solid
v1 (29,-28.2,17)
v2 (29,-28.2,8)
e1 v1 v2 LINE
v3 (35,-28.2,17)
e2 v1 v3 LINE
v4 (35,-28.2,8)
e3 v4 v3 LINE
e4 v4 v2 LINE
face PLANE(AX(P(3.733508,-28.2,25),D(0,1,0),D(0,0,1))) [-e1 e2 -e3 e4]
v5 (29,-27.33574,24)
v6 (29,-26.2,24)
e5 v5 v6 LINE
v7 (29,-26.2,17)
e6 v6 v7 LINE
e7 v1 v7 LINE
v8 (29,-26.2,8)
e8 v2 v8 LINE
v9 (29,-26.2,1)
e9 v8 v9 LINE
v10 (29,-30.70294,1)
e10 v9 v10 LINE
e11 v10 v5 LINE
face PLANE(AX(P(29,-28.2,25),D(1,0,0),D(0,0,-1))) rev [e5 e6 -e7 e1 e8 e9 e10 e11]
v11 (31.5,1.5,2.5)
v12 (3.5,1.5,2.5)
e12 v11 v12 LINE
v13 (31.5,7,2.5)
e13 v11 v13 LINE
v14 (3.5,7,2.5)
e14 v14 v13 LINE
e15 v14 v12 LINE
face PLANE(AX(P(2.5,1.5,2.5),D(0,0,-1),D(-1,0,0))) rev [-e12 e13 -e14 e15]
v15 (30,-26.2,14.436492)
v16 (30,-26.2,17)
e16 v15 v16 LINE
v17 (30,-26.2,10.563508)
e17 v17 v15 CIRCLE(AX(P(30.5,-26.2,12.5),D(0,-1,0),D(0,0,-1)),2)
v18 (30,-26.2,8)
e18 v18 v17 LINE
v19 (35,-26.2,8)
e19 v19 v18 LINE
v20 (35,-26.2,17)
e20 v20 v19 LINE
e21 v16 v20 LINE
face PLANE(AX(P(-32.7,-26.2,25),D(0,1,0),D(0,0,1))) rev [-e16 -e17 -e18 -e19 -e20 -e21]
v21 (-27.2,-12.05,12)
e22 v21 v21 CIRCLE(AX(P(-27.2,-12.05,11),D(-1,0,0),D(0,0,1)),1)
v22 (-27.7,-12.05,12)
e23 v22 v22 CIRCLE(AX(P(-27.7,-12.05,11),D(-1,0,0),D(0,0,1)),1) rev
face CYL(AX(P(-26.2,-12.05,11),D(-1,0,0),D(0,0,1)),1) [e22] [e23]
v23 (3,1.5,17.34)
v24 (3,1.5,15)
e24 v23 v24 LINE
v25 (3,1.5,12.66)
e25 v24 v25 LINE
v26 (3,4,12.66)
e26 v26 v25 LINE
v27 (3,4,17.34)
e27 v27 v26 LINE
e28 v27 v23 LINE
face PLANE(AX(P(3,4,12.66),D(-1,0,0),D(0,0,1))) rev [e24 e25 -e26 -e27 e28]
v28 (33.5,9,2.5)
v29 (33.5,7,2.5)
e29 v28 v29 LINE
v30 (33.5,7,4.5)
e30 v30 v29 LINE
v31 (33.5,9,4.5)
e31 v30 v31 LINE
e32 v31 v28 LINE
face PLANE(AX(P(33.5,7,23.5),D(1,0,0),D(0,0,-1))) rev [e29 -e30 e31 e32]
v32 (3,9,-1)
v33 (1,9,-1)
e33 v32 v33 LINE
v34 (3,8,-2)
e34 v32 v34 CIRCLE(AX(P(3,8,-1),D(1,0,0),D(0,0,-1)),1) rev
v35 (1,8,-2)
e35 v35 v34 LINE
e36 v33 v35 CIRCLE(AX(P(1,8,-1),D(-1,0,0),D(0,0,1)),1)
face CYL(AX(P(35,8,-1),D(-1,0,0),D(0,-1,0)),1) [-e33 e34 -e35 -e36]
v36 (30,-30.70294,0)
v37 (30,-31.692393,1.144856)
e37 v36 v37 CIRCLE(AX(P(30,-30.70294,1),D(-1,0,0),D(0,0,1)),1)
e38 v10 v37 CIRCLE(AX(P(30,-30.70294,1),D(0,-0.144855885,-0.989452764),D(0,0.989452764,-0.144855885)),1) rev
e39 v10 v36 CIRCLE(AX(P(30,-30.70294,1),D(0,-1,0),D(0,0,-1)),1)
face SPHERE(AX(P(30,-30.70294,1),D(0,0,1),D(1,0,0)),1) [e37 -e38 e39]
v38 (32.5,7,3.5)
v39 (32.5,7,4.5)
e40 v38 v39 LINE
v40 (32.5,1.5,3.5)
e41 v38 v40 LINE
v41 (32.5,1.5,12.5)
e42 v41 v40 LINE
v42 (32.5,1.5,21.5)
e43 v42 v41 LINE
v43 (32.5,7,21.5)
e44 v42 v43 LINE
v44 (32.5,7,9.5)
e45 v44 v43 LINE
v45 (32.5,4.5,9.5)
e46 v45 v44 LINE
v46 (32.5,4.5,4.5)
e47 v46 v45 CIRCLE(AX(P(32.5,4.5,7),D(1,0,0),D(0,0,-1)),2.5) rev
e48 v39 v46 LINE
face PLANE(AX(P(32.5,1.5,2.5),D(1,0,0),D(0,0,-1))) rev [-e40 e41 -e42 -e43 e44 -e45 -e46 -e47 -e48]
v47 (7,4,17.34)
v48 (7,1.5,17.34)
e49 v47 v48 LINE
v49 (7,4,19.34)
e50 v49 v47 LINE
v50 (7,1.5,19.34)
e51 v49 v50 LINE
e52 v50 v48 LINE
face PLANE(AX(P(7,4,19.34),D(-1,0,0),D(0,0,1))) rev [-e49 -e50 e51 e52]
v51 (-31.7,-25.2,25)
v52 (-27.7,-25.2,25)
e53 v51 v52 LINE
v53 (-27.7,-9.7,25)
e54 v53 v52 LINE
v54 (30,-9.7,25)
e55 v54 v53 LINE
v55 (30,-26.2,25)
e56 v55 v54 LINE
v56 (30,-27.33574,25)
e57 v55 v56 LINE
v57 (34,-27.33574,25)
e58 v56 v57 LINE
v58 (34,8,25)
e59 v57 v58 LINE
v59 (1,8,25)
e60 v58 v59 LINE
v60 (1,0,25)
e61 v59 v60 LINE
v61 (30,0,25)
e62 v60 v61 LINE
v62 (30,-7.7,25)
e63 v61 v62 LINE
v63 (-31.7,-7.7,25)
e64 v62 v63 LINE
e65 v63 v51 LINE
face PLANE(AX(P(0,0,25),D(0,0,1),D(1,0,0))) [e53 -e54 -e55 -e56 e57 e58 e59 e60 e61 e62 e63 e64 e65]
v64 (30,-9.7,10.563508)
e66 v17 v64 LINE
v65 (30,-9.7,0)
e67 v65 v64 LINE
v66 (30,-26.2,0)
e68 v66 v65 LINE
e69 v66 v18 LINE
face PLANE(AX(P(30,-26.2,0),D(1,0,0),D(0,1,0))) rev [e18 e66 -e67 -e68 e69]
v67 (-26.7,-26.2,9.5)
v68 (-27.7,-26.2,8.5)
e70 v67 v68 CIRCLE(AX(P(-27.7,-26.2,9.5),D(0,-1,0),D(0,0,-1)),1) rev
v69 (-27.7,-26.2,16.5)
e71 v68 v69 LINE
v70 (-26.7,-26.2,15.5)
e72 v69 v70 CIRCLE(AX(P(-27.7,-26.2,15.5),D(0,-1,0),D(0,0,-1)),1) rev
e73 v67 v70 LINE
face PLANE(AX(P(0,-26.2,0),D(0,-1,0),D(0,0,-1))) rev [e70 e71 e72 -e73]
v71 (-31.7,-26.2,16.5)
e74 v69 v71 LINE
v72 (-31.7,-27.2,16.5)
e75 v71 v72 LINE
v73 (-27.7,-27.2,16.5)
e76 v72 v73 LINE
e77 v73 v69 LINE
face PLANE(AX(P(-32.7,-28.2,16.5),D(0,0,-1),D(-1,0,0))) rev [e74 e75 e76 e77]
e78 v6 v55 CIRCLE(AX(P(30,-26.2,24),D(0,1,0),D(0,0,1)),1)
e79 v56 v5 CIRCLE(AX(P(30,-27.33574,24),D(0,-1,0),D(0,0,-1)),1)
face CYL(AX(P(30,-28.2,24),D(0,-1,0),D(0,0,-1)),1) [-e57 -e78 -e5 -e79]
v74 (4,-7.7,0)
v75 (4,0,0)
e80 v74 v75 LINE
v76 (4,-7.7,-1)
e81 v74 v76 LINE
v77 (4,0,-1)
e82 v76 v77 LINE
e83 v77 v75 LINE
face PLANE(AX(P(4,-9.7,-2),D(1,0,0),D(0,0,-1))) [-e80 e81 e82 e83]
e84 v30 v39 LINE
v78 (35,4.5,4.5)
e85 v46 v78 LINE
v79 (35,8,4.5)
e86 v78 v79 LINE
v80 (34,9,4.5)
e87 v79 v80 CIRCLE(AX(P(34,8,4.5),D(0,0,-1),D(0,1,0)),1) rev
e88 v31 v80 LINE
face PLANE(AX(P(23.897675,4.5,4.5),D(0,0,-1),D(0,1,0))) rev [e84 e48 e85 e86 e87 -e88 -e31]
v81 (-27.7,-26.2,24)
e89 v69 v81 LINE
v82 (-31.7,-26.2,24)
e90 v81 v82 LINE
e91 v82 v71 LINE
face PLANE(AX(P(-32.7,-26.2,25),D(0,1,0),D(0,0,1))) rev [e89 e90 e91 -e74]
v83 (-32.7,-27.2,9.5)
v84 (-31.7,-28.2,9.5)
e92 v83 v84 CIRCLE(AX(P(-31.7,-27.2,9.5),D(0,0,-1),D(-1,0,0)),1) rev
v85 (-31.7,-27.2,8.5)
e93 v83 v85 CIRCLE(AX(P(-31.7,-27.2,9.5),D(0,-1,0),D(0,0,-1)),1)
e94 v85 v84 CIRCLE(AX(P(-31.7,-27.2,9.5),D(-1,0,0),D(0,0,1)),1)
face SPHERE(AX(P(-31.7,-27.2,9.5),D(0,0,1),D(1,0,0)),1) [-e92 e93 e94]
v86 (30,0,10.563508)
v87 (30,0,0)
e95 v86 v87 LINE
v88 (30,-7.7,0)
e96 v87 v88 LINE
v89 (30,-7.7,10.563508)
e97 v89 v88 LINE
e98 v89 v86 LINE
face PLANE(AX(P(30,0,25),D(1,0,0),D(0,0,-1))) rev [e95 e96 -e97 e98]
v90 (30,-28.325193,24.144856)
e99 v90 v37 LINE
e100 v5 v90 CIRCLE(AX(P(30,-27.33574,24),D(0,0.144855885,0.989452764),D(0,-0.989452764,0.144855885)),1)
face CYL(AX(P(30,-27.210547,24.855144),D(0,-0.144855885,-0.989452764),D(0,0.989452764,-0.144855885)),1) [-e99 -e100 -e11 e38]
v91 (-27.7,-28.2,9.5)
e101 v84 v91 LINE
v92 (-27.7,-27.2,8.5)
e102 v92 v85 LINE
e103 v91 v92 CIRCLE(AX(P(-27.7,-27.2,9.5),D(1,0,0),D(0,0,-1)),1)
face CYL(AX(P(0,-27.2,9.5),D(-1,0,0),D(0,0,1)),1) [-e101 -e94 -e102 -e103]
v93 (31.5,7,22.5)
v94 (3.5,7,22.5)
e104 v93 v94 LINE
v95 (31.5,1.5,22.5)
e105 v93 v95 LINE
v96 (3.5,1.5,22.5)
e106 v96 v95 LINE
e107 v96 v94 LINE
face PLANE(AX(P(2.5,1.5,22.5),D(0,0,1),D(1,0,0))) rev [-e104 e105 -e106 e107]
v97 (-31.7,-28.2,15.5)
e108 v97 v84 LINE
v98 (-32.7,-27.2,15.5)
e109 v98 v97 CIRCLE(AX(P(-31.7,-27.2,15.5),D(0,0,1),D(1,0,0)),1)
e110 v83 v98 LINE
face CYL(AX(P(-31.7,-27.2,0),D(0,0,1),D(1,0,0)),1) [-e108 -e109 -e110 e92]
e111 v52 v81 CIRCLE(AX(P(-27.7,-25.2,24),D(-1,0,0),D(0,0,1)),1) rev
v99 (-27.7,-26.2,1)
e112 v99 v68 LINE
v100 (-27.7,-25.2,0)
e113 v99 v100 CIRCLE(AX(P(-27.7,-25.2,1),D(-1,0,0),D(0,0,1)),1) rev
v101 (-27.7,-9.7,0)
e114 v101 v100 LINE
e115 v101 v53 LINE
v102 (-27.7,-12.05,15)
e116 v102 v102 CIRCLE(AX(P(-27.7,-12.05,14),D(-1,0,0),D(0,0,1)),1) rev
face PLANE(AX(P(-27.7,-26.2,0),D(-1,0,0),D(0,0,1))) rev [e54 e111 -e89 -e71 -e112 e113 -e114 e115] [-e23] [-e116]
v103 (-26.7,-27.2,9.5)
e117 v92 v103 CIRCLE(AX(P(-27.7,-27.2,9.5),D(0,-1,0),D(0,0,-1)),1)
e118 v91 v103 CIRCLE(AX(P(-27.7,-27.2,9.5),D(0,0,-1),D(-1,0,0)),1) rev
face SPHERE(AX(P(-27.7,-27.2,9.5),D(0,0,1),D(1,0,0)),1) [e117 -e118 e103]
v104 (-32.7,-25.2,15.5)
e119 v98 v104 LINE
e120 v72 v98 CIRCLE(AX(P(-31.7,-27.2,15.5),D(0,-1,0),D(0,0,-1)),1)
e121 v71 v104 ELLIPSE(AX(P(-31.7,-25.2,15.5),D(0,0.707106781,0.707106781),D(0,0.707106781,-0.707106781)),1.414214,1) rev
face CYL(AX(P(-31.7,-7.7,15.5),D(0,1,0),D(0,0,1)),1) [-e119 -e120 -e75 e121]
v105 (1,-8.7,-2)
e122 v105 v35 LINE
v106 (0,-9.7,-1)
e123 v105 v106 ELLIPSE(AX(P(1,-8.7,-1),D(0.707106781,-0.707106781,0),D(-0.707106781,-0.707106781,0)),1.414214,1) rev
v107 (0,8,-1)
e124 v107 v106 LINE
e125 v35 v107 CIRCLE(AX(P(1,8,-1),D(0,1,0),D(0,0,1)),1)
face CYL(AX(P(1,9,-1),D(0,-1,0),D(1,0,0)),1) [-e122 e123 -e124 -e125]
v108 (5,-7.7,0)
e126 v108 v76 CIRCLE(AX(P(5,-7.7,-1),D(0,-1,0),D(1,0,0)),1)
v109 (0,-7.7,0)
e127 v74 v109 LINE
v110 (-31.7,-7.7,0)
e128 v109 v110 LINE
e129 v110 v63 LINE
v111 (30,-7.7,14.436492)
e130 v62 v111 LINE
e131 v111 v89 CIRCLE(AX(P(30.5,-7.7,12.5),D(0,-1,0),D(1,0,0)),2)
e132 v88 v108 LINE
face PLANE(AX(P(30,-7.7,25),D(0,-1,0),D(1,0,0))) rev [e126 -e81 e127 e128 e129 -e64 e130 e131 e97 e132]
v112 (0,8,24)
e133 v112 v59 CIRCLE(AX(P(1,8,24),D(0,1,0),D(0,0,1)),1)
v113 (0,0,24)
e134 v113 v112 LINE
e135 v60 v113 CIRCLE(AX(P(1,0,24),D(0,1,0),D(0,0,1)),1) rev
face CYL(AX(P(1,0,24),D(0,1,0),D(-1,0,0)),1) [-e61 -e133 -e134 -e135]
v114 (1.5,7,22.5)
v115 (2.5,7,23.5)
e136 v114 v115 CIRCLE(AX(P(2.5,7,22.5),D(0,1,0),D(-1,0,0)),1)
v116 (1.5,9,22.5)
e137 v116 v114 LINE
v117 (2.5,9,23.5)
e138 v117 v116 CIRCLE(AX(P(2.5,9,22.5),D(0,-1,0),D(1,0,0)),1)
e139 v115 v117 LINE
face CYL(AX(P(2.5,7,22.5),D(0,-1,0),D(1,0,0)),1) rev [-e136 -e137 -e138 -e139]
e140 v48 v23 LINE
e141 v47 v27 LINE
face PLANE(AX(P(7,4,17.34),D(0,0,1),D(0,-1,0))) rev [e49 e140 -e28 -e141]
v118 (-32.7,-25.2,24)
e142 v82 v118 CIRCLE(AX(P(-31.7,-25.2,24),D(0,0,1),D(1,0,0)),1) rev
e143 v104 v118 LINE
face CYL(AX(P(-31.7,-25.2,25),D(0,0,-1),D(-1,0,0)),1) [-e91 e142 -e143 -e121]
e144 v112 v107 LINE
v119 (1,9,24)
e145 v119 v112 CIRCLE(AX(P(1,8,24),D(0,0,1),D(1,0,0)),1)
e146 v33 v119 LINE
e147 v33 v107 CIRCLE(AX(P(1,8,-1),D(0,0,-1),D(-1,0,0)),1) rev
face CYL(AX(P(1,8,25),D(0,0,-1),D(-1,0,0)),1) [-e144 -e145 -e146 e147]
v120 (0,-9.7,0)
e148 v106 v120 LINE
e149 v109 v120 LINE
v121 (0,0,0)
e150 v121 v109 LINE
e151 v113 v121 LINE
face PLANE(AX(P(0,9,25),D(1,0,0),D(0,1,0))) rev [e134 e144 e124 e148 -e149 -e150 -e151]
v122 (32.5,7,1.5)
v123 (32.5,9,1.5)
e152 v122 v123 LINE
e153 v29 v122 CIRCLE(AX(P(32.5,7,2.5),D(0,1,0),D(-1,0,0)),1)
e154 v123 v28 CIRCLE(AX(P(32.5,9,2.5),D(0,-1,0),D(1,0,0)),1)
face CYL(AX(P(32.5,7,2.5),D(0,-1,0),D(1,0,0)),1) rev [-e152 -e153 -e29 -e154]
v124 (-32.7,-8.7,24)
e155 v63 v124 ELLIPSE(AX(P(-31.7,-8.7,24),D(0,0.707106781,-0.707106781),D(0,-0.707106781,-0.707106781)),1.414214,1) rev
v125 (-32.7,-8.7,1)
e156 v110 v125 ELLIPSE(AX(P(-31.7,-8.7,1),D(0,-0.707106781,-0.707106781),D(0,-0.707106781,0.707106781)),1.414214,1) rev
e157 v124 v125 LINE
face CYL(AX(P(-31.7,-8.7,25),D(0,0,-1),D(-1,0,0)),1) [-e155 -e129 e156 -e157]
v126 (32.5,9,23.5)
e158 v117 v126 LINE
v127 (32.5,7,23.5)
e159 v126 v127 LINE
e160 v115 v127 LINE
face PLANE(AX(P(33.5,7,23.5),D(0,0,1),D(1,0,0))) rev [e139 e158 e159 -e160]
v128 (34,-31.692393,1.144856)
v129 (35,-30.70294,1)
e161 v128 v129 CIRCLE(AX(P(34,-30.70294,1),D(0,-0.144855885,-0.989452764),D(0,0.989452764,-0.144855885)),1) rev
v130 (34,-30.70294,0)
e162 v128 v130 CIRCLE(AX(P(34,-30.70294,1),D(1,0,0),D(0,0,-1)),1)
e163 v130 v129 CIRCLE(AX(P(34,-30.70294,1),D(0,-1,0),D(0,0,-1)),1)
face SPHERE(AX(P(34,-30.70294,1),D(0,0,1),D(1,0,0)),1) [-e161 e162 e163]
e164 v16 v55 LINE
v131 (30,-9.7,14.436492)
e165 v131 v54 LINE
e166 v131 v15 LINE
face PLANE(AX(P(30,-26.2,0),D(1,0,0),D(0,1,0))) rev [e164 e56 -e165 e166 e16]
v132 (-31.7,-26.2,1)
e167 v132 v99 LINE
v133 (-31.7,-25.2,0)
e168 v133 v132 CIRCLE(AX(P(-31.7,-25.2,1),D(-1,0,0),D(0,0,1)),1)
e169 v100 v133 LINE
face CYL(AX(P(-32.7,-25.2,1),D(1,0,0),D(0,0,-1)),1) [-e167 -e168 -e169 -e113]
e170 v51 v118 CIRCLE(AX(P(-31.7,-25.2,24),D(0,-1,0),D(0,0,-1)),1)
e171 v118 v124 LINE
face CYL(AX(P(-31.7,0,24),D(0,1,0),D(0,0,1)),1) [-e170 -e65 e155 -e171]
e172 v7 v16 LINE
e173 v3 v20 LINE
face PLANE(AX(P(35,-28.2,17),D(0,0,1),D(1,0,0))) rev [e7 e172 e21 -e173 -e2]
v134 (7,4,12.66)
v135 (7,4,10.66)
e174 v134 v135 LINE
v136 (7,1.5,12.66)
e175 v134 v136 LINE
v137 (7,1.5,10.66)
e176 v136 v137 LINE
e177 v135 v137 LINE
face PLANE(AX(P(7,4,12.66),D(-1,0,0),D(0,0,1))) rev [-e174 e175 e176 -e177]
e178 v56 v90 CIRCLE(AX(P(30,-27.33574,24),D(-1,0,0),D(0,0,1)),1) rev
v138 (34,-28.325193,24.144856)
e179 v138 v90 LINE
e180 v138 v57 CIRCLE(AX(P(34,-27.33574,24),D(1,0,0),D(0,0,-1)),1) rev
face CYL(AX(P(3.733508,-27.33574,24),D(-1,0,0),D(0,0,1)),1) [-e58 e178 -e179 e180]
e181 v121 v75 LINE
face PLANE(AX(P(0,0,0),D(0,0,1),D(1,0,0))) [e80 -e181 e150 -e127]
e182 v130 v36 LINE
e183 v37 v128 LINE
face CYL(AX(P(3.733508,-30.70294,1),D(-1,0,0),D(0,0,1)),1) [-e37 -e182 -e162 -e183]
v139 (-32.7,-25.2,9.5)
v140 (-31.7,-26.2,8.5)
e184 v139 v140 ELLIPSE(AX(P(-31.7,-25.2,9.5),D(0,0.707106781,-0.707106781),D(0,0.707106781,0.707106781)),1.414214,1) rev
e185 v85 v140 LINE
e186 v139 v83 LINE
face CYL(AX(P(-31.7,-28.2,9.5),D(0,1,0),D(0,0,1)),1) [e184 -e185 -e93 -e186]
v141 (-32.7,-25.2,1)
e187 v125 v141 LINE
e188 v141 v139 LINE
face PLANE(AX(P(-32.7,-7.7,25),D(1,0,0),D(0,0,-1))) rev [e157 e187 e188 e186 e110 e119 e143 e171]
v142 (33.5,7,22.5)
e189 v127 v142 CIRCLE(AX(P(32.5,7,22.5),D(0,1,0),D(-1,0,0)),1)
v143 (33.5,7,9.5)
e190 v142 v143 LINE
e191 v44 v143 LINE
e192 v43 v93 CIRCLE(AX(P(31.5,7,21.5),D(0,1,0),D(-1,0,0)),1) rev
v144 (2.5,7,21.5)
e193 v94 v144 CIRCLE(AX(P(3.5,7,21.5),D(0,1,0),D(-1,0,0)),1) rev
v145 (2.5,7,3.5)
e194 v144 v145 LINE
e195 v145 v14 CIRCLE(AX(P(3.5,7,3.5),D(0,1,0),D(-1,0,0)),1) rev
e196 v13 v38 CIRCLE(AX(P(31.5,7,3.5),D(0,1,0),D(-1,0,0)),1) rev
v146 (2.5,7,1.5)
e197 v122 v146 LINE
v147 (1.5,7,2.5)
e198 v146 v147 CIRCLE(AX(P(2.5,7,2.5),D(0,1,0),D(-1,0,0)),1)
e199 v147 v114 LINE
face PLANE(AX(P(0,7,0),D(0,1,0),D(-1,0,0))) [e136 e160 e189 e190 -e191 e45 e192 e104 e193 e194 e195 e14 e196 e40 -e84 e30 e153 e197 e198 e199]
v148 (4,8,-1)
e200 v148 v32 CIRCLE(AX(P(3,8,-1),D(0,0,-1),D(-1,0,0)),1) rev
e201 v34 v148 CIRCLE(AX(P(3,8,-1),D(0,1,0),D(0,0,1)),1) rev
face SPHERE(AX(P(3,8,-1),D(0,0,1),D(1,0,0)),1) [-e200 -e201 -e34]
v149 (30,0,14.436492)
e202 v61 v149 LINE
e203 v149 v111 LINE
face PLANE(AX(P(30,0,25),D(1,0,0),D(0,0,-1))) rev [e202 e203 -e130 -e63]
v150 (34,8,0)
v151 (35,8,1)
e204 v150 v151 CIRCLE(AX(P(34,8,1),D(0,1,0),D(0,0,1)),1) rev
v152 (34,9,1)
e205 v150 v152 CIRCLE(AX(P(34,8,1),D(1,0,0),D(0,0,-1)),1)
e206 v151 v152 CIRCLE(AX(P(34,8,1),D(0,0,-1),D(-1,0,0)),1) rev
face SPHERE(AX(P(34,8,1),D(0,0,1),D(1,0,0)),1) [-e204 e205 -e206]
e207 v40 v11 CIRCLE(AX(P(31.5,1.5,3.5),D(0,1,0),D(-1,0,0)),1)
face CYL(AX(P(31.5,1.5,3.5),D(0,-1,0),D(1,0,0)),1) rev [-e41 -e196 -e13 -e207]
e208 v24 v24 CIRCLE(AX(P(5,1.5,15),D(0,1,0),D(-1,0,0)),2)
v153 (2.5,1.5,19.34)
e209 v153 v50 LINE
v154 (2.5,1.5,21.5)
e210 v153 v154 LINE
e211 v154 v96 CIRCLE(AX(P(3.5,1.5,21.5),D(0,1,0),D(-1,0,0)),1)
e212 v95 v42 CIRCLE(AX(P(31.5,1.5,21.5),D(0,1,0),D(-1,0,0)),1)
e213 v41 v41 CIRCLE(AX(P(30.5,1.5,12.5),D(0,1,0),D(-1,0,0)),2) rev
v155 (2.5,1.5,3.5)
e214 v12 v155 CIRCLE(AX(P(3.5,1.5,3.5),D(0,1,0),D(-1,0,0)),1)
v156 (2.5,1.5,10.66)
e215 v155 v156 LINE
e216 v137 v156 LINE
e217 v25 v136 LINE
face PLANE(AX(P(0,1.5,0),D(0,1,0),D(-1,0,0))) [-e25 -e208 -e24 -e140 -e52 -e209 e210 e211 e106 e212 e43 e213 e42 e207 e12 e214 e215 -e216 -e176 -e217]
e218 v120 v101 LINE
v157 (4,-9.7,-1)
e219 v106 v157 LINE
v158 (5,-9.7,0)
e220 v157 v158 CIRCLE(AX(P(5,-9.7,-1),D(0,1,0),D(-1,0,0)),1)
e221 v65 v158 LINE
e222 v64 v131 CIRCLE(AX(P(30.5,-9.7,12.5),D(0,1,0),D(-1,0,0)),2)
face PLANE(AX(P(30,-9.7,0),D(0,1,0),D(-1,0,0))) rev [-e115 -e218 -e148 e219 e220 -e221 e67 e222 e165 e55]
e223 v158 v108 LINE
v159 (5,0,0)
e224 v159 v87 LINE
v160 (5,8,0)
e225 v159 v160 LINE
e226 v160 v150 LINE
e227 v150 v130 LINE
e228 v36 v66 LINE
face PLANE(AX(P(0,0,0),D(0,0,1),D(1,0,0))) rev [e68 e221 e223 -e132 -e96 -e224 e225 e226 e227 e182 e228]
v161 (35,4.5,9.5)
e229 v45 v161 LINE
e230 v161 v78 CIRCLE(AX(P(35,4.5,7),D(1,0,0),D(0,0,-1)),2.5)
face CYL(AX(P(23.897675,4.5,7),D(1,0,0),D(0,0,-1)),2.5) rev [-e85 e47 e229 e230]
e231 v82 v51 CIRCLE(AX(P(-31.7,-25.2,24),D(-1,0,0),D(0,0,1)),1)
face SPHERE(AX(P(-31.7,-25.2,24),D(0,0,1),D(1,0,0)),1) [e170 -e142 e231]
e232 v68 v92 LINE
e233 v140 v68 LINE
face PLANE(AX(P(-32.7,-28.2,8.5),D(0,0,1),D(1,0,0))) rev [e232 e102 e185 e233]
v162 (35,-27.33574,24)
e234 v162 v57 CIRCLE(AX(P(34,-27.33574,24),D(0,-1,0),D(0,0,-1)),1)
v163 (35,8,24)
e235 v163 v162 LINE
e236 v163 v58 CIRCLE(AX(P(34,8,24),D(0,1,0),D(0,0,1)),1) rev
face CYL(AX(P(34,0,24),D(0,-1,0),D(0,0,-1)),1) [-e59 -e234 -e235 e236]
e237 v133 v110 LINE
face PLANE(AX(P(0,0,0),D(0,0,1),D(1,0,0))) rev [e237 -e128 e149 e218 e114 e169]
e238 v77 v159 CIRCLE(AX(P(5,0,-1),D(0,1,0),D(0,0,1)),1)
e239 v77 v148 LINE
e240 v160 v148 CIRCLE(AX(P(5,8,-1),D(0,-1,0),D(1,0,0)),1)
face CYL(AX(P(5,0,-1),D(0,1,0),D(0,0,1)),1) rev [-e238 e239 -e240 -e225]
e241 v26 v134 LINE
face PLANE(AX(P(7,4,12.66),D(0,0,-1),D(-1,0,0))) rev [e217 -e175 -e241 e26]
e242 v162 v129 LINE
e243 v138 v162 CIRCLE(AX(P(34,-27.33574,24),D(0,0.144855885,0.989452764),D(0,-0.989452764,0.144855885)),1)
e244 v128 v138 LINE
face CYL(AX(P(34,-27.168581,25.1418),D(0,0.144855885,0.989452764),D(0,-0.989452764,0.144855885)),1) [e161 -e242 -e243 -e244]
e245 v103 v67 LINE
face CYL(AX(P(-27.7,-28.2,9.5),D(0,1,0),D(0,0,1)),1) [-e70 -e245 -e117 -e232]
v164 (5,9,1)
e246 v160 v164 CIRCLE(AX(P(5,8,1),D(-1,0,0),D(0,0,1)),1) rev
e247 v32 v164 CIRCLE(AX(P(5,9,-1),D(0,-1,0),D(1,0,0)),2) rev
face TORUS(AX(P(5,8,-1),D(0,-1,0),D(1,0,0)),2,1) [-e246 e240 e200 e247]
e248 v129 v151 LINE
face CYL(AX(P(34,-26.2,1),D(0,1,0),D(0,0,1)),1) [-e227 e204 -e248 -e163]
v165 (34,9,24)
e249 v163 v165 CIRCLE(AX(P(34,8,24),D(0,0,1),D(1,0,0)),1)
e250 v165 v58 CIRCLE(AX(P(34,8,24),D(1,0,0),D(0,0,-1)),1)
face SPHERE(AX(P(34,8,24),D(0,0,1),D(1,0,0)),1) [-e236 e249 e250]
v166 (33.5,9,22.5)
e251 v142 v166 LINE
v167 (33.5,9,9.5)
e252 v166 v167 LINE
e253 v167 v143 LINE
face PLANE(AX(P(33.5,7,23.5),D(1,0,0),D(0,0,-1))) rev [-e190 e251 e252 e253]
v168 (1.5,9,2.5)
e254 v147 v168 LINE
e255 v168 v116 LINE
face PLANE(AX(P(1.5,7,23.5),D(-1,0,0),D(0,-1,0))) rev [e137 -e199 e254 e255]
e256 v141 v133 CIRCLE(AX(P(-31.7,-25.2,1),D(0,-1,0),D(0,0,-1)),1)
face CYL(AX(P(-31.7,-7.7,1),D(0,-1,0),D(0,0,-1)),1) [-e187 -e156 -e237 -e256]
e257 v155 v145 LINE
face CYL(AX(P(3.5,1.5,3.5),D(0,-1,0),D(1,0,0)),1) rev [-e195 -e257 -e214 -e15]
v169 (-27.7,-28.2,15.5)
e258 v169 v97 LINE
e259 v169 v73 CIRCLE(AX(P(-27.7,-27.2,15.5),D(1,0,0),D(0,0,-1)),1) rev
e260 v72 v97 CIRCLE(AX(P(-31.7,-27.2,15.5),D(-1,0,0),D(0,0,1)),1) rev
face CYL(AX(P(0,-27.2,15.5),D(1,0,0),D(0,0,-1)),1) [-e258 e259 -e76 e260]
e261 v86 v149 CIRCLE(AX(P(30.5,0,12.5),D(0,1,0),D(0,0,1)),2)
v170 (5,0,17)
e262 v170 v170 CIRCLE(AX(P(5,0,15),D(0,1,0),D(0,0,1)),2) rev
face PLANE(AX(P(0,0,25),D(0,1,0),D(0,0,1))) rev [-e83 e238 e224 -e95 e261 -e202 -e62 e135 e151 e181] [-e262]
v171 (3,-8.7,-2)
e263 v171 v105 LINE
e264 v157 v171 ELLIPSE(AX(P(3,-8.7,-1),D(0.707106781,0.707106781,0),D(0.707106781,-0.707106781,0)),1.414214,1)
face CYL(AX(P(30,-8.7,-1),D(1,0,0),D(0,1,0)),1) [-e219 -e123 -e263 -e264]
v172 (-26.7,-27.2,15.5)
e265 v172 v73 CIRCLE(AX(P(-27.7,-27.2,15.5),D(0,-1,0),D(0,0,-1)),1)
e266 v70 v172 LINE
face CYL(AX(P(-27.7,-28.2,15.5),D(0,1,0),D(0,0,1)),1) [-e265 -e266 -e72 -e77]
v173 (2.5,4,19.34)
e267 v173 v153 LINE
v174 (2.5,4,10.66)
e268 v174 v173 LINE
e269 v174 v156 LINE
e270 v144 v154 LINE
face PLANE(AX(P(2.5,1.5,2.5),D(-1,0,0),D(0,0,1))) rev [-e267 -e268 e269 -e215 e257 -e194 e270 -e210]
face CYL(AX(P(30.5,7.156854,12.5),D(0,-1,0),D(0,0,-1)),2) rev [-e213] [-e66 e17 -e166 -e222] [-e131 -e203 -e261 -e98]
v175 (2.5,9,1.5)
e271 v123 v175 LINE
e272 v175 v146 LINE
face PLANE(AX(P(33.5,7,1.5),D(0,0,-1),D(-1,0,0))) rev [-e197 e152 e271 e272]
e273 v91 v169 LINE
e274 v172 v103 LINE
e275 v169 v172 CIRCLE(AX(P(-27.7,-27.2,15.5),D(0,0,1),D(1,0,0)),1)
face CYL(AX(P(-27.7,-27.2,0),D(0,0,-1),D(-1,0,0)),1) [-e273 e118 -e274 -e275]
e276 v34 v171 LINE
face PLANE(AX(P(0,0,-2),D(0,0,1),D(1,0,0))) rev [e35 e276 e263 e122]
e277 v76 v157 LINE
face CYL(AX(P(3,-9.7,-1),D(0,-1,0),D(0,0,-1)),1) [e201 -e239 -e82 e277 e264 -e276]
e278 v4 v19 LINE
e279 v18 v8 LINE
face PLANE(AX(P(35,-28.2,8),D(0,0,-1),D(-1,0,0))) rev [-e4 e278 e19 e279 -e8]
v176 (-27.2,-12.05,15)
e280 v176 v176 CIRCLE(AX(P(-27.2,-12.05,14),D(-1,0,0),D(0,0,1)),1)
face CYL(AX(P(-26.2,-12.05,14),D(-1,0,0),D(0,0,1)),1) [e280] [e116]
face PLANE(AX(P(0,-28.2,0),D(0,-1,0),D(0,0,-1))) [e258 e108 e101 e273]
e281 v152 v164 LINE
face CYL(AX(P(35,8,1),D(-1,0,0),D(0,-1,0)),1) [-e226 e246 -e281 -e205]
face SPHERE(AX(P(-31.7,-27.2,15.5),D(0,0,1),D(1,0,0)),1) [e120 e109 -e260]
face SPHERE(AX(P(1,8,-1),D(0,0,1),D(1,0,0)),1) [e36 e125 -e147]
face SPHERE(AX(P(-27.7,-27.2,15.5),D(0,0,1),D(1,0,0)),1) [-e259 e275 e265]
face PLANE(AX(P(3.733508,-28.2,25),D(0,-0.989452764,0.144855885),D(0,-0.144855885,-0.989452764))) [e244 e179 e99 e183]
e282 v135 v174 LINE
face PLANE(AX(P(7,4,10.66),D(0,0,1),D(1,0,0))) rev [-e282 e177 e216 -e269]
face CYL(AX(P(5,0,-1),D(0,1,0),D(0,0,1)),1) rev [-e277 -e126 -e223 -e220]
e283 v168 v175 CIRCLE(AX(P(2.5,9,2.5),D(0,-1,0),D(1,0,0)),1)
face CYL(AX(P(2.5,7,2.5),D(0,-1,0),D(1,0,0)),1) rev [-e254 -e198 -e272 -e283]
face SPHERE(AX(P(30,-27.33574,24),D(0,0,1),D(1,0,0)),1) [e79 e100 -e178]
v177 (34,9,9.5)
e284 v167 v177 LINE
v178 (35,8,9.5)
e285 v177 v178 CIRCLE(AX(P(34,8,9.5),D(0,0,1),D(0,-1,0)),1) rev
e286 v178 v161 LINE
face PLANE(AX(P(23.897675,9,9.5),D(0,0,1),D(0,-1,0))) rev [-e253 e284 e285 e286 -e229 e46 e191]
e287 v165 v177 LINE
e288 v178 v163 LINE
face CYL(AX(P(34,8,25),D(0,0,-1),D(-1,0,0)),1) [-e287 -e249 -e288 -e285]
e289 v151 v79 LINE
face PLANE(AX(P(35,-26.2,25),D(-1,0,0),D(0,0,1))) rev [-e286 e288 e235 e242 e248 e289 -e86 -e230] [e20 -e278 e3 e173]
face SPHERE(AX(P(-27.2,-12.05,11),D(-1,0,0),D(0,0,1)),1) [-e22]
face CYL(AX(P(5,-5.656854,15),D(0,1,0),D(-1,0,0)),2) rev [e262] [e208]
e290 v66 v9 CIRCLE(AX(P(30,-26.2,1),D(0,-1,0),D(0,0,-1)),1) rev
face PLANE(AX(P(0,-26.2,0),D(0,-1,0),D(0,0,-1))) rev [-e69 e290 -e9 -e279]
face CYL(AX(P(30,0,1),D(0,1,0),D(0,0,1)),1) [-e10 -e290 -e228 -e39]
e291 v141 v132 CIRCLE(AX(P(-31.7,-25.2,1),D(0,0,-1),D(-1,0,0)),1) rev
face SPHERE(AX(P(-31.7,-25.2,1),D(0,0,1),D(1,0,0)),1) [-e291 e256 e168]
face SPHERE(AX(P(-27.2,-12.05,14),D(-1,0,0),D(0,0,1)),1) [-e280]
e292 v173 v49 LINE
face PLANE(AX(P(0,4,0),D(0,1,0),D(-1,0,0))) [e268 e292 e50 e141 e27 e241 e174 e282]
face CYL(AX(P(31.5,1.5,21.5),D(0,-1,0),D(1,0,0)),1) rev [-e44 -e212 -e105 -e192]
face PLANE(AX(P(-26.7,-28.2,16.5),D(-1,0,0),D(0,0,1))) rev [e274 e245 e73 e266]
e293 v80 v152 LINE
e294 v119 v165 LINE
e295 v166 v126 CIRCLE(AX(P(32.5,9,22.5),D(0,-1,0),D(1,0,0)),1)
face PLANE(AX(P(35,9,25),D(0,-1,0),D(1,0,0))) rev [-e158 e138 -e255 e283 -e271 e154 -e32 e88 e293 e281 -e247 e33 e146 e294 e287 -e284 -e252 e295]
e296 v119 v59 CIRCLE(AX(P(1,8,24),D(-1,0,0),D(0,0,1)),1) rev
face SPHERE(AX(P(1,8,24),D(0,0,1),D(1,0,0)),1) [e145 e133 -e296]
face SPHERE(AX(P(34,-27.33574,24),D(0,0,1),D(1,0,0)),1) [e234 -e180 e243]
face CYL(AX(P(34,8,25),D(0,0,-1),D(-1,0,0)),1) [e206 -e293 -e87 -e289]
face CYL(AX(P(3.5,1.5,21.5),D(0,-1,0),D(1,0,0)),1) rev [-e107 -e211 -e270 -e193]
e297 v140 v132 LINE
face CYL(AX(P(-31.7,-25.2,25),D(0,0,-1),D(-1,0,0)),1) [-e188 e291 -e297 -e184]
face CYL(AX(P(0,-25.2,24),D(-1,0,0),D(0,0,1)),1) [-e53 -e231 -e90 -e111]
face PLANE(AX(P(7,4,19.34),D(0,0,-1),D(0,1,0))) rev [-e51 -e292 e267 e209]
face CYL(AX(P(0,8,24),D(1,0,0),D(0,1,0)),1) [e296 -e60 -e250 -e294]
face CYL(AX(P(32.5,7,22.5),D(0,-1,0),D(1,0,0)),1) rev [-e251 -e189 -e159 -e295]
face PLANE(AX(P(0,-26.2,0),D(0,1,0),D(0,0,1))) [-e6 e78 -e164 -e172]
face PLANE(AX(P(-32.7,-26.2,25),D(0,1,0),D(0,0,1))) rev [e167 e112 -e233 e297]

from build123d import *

# Parameters (mm, degrees)
BOSS_EXTRUDE1_DEPTH = 25
SKETCH2_W           = 57.7
SKETCH2_H           = 16.5
CUT_EXTRUDE1_DEPTH  = 51.363081717
SKETCH3_W           = 30
SKETCH3_H           = 20
CUT_EXTRUDE2_DEPTH  = 7.5
CUT_EXTRUDE3_REACH  = 57.579
SKETCH4_R           = 2
SKETCH5_R           = 2
CUT_EXTRUDE4_DEPTH  = 1.5
SKETCH6_W           = 6
SKETCH6_H           = 8
BOSS_EXTRUDE2_DEPTH = 2
BOSS_EXTRUDE4_DEPTH = 6
SKETCH9_W           = 32
SKETCH9_H           = 22
CUT_EXTRUDE5_DEPTH  = 2
FILLET1_R           = 1
SKETCH10_R          = 1
BOSS_EXTRUDE5_DEPTH = 1.5
FILLET3_R           = 1
SKETCH7_W           = 4
SKETCH7_H           = 18.7
BOSS_EXTRUDE6_DEPTH = 2
FILLET4_R           = 1
SKETCH11_W          = 4.5
SKETCH11_H          = 2
BOSS_EXTRUDE7_DEPTH = 2.5
SKETCH12_W          = 0.5
SKETCH12_H          = 4.68
BOSS_EXTRUDE8_DEPTH = 2.5
CUT_EXTRUDE6_REACH  = 80.825


with BuildPart() as part:
    # Sketch1 → Boss-Extrude1 (new body)
    with BuildSketch(Plane.XY):
        Polygon((0, 0), (30, 0), (30, -7.7), (-32.7, -7.7), (-32.7, -26.2), (35, -26.2), (35, 9), (0, 9), align=None)
    extrude(amount=BOSS_EXTRUDE1_DEPTH)

    # Sketch2 → Cut-Extrude1 (cut, through all)
    with BuildSketch(Plane.XY.offset(25)):
        with Locations((1.15, -17.95)):
            Rectangle(SKETCH2_W, SKETCH2_H)
    extrude(amount=-CUT_EXTRUDE1_DEPTH, mode=Mode.SUBTRACT)

    # Sketch3 → Cut-Extrude2 (cut)
    with BuildSketch(Plane(origin=(0, 9, 0), x_dir=(1, 0, 0), z_dir=(0, 1, 0))):
        with Locations((17.5, -12.5)):
            Rectangle(SKETCH3_W, SKETCH3_H)
    extrude(amount=-CUT_EXTRUDE2_DEPTH, mode=Mode.SUBTRACT)

    # Cut-Extrude3: up to this face of the body (flat: up to its plane)
    cut_extrude3_end = Plane(part.part.faces().sort_by_distance((17.5, 1.5, 12.5))[0])
    # Sketch4 → Cut-Extrude3 (cut, up to the picked face)
    with BuildSketch(Plane.XZ.offset(26.2), mode=Mode.PRIVATE) as cut_extrude3_sk1:
        with Locations(Location((30.5, 12.5, 0), (0, 0, 255.522487814))):
            Circle(SKETCH4_R)
    cut_extrude3_tool1 = split(extrude(cut_extrude3_sk1.sketch, amount=-CUT_EXTRUDE3_REACH, mode=Mode.PRIVATE), bisect_by=cut_extrude3_end, keep=Keep.BOTH, mode=Mode.PRIVATE)
    add(cut_extrude3_tool1.solids().sort_by(Axis((30.5, -26.2, 12.5), (0, 1, 0)))[0], mode=Mode.SUBTRACT)

    # Sketch5 → Cut-Extrude4 (cut)
    with BuildSketch(Plane(origin=(0, 1.5, 0), x_dir=(1, 0, 0), z_dir=(0, 1, 0))):
        with Locations(Location((5, -15, 0), (0, 0, 180))):
            Circle(SKETCH5_R)
    extrude(amount=-CUT_EXTRUDE4_DEPTH, mode=Mode.SUBTRACT)

    # Sketch6 → Boss-Extrude2 (add)
    with BuildSketch(Plane.XZ.offset(26.2)):
        with Locations((32, 21)):
            Rectangle(SKETCH6_W, SKETCH6_H)
        with Locations((32, 4)):
            Rectangle(SKETCH6_W, SKETCH6_H)
        with Locations((-29.7, 12.5)):
            Rectangle(SKETCH6_W, SKETCH6_H)
    extrude(amount=BOSS_EXTRUDE2_DEPTH)

    # Sketch8 → Boss-Extrude4 (add)
    with BuildSketch(Plane(origin=(35, 0, 0), x_dir=(0, 0, -1), z_dir=(1, 0, 0))):
        Polygon((-25, -28.2), (0, -31.86), (0, -28.2), align=None)
    extrude(amount=-BOSS_EXTRUDE4_DEPTH)

    # Sketch9 → Cut-Extrude5 (cut)
    with BuildSketch(Plane(origin=(0, 9, 0), x_dir=(1, 0, 0), z_dir=(0, 1, 0))):
        with Locations((17.5, -12.5)):
            Rectangle(SKETCH9_W, SKETCH9_H)
    extrude(amount=-CUT_EXTRUDE5_DEPTH, mode=Mode.SUBTRACT)

    # Fillet1
    fillet1_edges = [part.edges().sort_by_distance(p)[0] for p in [
        (33.5, 8, 1.5),
        (33.5, 8, 23.5),
        (1.5, 8, 23.5),
        (1.5, 8, 1.5),
        (2.5, 4.25, 22.5),
        (2.5, 4.25, 2.5),
        (32.5, 4.25, 2.5),
        (32.5, 4.25, 22.5),
    ]]
    fillet(fillet1_edges, radius=FILLET1_R)

    # Sketch10 → Boss-Extrude5 (add)
    with BuildSketch(Plane(origin=(-27.7, 0, 0), x_dir=(0, 0, -1), z_dir=(1, 0, 0))):
        with Locations(Location((-14, -12.05, 0), (0, 0, 180))):
            Circle(SKETCH10_R)
        with Locations(Location((-11, -12.05, 0), (0, 0, 180))):
            Circle(SKETCH10_R)
    extrude(amount=BOSS_EXTRUDE5_DEPTH)

    # Fillet3
    fillet3_edges = [part.edges().sort_by_distance(p)[0] for p in [
        (-26.2, -12.05, 13),
        (-26.2, -12.05, 10),
    ]]
    fillet(fillet3_edges, radius=FILLET3_R)

    # Sketch7 → Boss-Extrude6 (add)
    with BuildSketch(Plane.XY):
        with Locations((2, -0.35)):
            Rectangle(SKETCH7_W, SKETCH7_H)
    extrude(amount=-BOSS_EXTRUDE6_DEPTH)

    # Fillet4
    fillet4_edges = [part.edges().sort_by_distance(p)[0] for p in [
        (4, -8.7, 0),
        (4, 4.5, 0),
    ]]
    fillet(fillet4_edges, radius=FILLET4_R)
    fillet4_2_edges = [part.edges().sort_by_distance(p)[0] for p in [
        (-29.7, -28.2, 16.5),
        (-26.7, -28.2, 12.5),
        (-29.7, -28.2, 8.5),
        (-32.7, -28.2, 12.5),
        (32, -31.86, 0),
        (32, -28.2, 25),
        (29, -30.03, 12.5),
        (35, -30.03, 12.5),
        (-30.2, -26.2, 0),
        (-30.2, -26.2, 25),
        (29, -29.03, 0),
        (29, -27.2, 25),
        (-26.7, -27.2, 8.5),
        (-26.7, -27.2, 16.5),
        (-32.7, -27.2, 8.5),
        (-32.7, -27.2, 16.5),
        (-32.7, -26.2, 4.25),
        (-32.7, -26.2, 20.75),
        (-32.7, -16.95, 0),
        (-32.7, -16.95, 25),
        (-32.7, -7.7, 12.5),
        (4, -0.35, -2),
        (2, -9.7, -2),
        (20, 9, 0),
        (2, 9, -2),
        (0, -0.35, -2),
        (0, 9, 11.5),
        (0, 4.5, 25),
        (17.5, 9, 25),
        (35, 9, 12.5),
        (35, -9.6, 25),
        (35, -11.43, 0),
        (4.292893219, 9, -0.292893219),
    ]]
    fillet(fillet4_2_edges, radius=FILLET4_R - 0.0001)  # a hair under: the kernel refuses the full size

    # Sketch11 → Boss-Extrude7 (add)
    with BuildSketch(Plane(origin=(0, 1.5, 0), x_dir=(1, 0, 0), z_dir=(0, 1, 0))):
        with Locations((4.75, -18.34)):
            Rectangle(SKETCH11_W, SKETCH11_H)
        with Locations((4.75, -11.66)):
            Rectangle(SKETCH11_W, SKETCH11_H)
    extrude(amount=BOSS_EXTRUDE7_DEPTH)

    # Sketch12 → Boss-Extrude8 (add)
    with BuildSketch(Plane(origin=(0, 1.5, 0), x_dir=(1, 0, 0), z_dir=(0, 1, 0))):
        with Locations((2.75, -15)):
            Rectangle(SKETCH12_W, SKETCH12_H)
    extrude(amount=BOSS_EXTRUDE8_DEPTH)

    # Cut-Extrude6: up to this face of the body (flat: up to its plane)
    cut_extrude6_end = Plane(part.part.faces().sort_by_distance((32.5, 4.25, 12.5))[0])
    # Sketch13 → Cut-Extrude6 (cut, up to the picked face)
    with BuildSketch(Plane(origin=(35, 0, 0), x_dir=(0, 0, -1), z_dir=(1, 0, 0)), mode=Mode.PRIVATE) as cut_extrude6_sk1:
        with BuildLine():
            Line((-9.5, 9), (-9.5, 4.5))
            ThreePointArc((-9.5, 4.5), (-7, 2), (-4.5, 4.5))
            Line((-4.5, 4.5), (-4.5, 9))
            Line((-4.5, 9), (-9.5, 9))
        make_face()
    cut_extrude6_tool1 = split(extrude(cut_extrude6_sk1.sketch, amount=-CUT_EXTRUDE6_REACH, mode=Mode.PRIVATE), bisect_by=cut_extrude6_end, keep=Keep.BOTH, mode=Mode.PRIVATE)
    add(cut_extrude6_tool1.solids().sort_by(Axis((35, 5.744167, 7), (-1, 0, 0)))[0], mode=Mode.SUBTRACT)


solid = part.part
